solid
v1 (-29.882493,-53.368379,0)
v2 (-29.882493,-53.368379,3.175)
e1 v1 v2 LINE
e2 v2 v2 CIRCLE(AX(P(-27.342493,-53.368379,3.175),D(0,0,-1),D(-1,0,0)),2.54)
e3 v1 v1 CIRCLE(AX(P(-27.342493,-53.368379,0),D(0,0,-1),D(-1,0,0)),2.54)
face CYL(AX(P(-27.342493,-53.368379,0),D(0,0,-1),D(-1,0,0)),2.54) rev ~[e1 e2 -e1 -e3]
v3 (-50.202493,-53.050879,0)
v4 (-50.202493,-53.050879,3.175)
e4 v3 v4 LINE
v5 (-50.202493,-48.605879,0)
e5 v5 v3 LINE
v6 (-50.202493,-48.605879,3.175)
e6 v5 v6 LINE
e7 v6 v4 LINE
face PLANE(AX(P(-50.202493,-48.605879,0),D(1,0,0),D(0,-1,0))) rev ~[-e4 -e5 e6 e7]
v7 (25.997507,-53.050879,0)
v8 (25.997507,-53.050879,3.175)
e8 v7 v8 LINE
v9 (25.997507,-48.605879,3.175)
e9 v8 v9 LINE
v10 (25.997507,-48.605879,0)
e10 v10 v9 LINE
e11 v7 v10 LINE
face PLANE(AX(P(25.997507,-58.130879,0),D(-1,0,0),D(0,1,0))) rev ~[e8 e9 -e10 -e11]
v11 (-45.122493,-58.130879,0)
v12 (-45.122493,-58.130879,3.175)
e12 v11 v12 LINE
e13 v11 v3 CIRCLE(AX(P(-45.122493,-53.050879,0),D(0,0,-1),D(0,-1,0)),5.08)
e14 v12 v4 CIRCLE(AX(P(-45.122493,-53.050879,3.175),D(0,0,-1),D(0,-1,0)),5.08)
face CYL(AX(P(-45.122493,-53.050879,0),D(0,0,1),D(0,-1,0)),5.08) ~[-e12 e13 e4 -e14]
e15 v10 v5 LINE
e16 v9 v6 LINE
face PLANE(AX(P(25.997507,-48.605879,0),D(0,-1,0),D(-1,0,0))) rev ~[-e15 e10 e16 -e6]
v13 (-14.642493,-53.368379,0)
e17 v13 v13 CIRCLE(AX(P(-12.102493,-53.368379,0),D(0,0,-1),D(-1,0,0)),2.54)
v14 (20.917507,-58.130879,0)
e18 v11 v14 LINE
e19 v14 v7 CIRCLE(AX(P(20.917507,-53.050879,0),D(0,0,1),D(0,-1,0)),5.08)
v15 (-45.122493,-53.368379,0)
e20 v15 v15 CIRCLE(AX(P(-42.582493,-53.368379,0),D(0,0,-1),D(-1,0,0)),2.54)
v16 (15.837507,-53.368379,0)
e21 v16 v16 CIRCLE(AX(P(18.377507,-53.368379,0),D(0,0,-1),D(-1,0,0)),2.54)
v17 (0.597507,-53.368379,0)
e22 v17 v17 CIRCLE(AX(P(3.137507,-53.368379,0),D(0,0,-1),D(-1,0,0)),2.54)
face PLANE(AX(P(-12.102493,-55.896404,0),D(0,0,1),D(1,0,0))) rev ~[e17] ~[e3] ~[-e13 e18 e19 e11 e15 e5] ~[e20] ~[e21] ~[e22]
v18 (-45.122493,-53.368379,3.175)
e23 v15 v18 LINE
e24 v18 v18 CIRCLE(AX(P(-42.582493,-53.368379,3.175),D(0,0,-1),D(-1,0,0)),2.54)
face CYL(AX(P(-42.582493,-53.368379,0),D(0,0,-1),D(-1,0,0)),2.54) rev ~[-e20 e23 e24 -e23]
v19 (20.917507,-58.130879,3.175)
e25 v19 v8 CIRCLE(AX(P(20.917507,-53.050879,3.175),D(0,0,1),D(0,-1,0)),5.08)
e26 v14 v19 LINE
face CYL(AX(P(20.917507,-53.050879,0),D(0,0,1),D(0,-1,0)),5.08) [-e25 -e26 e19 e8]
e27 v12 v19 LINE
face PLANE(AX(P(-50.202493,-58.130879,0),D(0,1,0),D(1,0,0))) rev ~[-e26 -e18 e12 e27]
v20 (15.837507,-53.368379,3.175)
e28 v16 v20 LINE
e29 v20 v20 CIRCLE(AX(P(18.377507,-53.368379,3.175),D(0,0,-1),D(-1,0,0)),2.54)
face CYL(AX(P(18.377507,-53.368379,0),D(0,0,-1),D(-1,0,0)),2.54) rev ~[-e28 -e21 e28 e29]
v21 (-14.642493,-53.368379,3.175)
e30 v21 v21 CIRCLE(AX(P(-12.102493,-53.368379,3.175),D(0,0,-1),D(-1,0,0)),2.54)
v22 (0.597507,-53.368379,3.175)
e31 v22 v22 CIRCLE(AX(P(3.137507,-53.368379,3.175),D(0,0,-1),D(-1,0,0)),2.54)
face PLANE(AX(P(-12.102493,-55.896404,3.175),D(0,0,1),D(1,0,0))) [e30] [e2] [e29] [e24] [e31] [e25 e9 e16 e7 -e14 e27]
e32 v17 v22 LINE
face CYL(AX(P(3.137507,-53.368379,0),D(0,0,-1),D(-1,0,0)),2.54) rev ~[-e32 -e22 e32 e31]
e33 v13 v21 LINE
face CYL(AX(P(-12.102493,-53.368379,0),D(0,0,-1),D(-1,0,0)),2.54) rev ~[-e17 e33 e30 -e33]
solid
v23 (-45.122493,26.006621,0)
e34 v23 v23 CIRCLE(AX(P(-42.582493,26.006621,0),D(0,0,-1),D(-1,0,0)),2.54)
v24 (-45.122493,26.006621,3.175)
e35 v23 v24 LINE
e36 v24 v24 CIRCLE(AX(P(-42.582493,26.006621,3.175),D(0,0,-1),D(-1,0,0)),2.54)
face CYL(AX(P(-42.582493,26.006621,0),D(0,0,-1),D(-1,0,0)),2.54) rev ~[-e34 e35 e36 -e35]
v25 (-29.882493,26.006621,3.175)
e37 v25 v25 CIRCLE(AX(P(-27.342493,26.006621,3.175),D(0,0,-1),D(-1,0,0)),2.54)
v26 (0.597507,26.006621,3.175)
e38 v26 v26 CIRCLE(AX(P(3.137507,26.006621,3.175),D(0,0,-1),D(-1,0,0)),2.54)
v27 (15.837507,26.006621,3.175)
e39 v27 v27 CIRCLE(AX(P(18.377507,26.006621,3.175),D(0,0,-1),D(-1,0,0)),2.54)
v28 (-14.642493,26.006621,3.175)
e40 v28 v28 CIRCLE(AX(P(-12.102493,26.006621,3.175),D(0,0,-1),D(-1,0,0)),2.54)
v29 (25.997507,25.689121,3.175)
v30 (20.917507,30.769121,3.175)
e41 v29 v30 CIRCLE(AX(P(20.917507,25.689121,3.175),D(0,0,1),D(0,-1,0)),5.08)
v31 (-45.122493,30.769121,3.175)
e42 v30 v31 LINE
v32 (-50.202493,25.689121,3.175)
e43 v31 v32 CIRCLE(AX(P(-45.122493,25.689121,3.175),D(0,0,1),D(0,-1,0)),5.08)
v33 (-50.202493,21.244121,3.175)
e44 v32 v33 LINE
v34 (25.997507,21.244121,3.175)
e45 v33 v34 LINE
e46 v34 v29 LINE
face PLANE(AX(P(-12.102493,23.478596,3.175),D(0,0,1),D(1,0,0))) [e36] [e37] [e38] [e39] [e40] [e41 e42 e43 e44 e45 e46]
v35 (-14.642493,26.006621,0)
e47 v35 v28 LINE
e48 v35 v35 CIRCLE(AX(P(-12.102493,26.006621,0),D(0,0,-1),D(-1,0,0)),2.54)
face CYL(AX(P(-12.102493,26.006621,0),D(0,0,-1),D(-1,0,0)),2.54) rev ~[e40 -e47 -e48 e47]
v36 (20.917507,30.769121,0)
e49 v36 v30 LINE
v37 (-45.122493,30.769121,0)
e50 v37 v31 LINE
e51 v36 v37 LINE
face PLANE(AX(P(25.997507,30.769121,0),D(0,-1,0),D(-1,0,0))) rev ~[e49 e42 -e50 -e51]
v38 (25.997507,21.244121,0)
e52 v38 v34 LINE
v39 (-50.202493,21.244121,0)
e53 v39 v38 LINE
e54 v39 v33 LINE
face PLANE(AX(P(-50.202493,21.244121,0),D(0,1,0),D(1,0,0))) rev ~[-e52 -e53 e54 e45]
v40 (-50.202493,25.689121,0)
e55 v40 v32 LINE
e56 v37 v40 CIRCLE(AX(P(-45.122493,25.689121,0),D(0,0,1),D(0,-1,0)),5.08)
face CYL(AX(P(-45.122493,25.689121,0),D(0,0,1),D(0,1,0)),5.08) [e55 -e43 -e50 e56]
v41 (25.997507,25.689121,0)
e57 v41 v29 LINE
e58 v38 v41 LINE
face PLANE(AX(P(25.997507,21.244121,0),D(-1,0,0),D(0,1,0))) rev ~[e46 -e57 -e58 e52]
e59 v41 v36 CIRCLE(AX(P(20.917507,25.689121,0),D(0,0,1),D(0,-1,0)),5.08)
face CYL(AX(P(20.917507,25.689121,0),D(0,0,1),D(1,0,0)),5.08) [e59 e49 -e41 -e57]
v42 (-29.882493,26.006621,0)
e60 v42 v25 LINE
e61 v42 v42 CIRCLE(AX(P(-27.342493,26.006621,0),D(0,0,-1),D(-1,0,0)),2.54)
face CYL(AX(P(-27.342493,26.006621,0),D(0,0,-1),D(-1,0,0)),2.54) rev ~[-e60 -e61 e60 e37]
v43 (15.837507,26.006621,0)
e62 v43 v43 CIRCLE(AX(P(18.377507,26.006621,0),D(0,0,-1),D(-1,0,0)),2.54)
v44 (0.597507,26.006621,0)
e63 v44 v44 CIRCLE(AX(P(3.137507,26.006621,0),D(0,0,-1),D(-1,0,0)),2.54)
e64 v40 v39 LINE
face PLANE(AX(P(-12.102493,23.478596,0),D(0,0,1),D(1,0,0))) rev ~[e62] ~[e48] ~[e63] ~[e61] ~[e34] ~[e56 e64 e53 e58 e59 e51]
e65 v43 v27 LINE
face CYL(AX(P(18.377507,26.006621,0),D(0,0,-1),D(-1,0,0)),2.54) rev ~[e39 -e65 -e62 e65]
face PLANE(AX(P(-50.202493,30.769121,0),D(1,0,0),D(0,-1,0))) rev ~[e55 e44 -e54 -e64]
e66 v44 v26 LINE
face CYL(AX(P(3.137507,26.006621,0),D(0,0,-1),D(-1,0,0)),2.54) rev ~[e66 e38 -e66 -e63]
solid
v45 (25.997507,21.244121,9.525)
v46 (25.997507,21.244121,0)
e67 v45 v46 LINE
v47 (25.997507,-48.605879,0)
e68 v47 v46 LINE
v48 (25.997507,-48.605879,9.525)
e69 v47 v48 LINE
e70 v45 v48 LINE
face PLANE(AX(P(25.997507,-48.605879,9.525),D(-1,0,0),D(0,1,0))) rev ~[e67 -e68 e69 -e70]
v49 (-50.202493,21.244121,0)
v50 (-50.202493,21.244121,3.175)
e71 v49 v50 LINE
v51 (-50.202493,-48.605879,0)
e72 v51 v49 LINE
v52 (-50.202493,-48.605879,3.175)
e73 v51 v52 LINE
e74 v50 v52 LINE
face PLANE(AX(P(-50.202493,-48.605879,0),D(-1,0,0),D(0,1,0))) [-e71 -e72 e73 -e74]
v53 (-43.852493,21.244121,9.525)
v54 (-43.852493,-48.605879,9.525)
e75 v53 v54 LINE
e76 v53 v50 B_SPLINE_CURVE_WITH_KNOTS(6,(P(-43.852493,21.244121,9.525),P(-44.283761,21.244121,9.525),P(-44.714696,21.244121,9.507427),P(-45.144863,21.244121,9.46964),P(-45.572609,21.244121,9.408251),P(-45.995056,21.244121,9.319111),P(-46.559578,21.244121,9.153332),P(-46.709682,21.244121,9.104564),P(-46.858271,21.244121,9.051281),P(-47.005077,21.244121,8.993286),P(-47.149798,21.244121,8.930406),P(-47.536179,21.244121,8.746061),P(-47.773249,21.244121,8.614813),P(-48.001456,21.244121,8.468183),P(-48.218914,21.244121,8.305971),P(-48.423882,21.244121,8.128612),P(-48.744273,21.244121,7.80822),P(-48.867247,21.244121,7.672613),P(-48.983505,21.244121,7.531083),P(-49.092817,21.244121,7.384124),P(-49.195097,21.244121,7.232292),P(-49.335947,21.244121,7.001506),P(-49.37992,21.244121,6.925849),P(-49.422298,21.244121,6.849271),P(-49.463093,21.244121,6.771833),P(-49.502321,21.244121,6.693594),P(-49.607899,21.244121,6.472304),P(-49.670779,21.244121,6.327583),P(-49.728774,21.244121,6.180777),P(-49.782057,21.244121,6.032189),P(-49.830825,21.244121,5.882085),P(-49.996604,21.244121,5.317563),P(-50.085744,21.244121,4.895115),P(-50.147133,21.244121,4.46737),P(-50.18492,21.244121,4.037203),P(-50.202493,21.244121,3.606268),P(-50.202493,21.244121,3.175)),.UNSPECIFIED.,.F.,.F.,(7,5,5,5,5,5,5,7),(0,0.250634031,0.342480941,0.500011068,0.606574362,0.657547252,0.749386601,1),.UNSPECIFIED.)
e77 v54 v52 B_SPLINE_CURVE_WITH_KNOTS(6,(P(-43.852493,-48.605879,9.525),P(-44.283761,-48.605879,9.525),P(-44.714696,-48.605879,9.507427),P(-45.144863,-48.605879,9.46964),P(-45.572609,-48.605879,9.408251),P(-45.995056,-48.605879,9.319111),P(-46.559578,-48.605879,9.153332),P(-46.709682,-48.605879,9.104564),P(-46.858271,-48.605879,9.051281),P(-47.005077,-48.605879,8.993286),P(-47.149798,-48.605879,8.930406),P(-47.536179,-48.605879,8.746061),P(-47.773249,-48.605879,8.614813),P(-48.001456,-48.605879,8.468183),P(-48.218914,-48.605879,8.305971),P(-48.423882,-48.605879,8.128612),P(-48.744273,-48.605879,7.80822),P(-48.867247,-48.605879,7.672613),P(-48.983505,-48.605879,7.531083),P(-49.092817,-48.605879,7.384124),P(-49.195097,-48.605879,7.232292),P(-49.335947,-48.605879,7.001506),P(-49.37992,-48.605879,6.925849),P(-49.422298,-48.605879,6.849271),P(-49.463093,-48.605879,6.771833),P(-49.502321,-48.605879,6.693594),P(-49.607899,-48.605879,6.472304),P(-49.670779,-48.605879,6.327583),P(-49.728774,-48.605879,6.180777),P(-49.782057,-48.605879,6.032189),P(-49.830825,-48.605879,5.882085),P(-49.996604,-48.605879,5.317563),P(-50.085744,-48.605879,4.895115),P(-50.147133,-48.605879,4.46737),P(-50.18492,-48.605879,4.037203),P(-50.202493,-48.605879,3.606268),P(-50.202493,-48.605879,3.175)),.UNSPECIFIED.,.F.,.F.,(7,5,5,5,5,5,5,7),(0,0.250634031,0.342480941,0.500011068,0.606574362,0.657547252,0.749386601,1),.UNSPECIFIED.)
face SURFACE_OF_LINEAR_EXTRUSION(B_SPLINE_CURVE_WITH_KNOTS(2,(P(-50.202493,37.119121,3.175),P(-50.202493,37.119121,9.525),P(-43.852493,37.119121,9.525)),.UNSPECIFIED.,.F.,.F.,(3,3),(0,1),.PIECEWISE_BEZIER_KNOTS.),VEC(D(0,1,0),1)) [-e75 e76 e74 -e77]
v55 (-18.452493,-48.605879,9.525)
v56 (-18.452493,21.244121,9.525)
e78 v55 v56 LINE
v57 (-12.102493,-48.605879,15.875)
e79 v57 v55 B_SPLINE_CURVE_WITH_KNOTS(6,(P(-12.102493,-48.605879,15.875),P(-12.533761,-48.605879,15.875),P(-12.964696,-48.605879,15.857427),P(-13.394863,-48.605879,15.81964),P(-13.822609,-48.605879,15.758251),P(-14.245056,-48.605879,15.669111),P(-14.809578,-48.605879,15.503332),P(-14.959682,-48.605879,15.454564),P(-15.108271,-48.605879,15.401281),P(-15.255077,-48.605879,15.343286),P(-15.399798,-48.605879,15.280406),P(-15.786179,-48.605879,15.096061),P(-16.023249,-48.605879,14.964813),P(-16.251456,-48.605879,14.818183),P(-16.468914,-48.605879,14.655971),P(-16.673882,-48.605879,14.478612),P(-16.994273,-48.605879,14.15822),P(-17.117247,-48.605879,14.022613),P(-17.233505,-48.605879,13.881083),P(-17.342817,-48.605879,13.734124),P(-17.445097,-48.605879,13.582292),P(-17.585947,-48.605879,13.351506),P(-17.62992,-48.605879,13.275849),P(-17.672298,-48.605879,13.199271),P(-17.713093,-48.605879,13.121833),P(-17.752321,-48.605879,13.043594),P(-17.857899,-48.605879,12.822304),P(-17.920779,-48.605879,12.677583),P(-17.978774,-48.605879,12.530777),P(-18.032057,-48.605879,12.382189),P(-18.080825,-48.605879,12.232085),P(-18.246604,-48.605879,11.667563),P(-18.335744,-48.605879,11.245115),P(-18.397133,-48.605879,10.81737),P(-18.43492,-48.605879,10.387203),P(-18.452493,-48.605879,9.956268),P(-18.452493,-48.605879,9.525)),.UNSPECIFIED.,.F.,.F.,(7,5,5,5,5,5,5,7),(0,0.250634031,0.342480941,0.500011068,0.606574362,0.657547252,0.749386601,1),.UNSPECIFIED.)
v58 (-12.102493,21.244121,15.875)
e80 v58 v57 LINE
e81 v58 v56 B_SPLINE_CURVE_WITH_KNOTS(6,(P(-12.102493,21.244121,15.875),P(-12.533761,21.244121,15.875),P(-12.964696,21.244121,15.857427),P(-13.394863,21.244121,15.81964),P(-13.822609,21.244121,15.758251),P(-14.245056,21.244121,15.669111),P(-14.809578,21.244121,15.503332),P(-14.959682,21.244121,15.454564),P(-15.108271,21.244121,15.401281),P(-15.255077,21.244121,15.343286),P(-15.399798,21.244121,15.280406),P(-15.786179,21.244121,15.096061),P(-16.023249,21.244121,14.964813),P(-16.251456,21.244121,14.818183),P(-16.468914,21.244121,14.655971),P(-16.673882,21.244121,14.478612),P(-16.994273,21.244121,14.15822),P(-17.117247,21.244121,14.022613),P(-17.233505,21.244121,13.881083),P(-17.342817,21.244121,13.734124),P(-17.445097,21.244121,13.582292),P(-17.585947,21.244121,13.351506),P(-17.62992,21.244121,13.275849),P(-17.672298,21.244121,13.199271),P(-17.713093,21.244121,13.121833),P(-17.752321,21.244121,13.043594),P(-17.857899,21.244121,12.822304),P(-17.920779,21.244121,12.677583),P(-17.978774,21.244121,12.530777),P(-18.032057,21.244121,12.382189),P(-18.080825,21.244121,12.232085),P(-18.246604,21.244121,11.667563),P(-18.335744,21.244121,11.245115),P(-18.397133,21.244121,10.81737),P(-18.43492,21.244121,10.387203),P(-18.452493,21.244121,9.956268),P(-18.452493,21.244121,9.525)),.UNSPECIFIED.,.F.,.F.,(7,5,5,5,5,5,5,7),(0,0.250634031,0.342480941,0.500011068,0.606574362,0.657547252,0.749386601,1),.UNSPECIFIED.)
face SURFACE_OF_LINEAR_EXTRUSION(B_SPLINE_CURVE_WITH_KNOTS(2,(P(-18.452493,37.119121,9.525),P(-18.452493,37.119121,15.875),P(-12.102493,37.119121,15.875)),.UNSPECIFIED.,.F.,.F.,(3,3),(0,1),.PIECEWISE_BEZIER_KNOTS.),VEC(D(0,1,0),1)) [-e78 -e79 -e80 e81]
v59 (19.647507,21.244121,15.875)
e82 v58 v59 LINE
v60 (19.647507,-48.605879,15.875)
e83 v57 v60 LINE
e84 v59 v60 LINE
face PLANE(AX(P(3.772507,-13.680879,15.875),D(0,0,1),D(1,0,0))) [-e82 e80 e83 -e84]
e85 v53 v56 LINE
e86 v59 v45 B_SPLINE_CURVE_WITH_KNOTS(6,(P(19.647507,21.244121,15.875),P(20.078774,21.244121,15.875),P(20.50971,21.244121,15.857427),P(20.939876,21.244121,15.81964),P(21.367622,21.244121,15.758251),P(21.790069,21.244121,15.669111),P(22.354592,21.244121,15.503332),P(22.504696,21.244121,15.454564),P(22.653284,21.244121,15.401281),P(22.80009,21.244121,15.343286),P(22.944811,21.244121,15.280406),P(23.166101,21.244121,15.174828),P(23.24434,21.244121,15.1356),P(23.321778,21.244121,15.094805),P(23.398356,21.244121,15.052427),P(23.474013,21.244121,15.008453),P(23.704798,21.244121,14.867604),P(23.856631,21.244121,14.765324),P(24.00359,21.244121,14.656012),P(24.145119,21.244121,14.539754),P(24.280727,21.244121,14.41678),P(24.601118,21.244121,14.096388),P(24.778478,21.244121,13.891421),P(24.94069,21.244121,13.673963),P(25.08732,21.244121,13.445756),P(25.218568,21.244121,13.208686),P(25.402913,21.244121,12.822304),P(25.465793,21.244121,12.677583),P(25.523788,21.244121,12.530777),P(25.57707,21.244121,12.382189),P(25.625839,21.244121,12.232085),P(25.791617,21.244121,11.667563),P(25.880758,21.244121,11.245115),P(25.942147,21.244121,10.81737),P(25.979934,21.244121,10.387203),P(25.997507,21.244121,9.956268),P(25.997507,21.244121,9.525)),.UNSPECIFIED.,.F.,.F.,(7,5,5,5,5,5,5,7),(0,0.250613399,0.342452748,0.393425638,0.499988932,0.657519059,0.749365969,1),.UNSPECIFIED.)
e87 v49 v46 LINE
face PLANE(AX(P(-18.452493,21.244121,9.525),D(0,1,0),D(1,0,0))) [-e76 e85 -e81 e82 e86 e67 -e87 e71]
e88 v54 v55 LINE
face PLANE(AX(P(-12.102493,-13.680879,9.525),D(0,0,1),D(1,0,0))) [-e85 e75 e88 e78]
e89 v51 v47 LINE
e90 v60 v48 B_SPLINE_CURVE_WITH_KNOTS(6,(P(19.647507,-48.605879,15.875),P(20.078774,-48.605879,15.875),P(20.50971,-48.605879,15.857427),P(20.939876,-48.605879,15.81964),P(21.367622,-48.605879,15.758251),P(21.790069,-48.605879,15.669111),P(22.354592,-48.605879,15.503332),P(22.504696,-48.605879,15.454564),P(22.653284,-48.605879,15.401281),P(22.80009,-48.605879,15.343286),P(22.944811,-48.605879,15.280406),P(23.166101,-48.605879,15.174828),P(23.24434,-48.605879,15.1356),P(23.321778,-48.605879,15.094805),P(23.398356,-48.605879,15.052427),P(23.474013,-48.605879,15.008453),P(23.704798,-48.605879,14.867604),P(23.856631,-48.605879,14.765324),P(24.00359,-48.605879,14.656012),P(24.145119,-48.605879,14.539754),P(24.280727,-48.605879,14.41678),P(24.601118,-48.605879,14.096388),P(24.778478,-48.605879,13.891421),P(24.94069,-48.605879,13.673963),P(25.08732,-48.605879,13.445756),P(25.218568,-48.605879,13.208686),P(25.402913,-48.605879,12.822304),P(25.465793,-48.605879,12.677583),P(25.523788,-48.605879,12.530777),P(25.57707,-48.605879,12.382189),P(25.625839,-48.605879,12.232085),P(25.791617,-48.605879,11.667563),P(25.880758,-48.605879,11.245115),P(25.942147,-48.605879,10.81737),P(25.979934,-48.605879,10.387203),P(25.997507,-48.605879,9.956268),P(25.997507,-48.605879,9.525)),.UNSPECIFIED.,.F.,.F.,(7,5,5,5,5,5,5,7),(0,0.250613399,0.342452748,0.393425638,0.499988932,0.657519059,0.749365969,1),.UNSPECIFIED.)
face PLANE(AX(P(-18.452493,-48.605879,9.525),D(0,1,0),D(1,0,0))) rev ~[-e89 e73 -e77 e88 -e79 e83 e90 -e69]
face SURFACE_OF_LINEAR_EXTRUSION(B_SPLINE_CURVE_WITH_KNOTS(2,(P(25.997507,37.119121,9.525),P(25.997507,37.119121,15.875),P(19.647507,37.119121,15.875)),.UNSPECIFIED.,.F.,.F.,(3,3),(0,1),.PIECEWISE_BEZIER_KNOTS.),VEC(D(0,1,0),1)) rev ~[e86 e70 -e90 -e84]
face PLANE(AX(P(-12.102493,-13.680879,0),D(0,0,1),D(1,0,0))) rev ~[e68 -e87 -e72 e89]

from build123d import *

# Parameters (mm, degrees)
F1_DEPTH    = 3.175
F0_W        = 76.2
F0_H        = 69.85
F2_DEPTH    = 9.525
F3_W        = 44.45
F3_H        = 69.85
F4_DEPTH    = 6.35
F5_T1_DEPTH = 101.6
F6_R        = 5.08
F6_2_R      = 5.08


# Not quite as in the source:
# - a fillet or chamfer that OpenCascade refuses, or shapes differently, is made with other operations: its cross-section is extruded or revolved along the edge and cut away or added


with BuildPart() as f1:
    # F0 (on Top) → F1 (new body)
    with BuildSketch(Plane.XY):
        with BuildLine():
            Line((-45.1224932384, -53.3683788409), (-50.2024932384, -53.3683788409))
            Line((-50.2024932384, -53.3683788409), (-50.2024932384, -58.1308788409))
            Line((-50.2024932384, -58.1308788409), (25.9975067616, -58.1308788409))
            Line((25.9975067616, -58.1308788409), (25.9975067616, -53.3683788409))
            Line((25.9975067616, -53.3683788409), (20.9175067616, -53.3683788409))
            ThreePointArc((20.9175067616, -53.3683788409), (18.3775067616, -55.9083788409), (15.8375067616, -53.3683788409))
            Line((15.8375067616, -53.3683788409), (5.6775067616, -53.3683788409))
            ThreePointArc((5.6775067616, -53.3683788409), (3.1375067616, -55.9083788409), (0.5975067616, -53.3683788409))
            Line((0.5975067616, -53.3683788409), (-9.5624932384, -53.3683788409))
            ThreePointArc((-9.5624932384, -53.3683788409), (-12.1024932384, -55.9083788409), (-14.6424932384, -53.3683788409))
            Line((-14.6424932384, -53.3683788409), (-24.8024932384, -53.3683788409))
            ThreePointArc((-24.8024932384, -53.3683788409), (-27.3424932384, -55.9083788409), (-29.8824932384, -53.3683788409))
            Line((-29.8824932384, -53.3683788409), (-40.0424932384, -53.3683788409))
            ThreePointArc((-40.0424932384, -53.3683788409), (-42.5824932384, -55.9083788409), (-45.1224932384, -53.3683788409))
        make_face()
        with BuildLine():
            Line((25.9975067616, -48.6058788409), (-50.2024932384, -48.6058788409))
            Line((-50.2024932384, -48.6058788409), (-50.2024932384, -53.3683788409))
            Line((-50.2024932384, -53.3683788409), (-45.1224932384, -53.3683788409))
            ThreePointArc((-45.1224932384, -53.3683788409), (-42.5824932384, -50.8283788409), (-40.0424932384, -53.3683788409))
            Line((-40.0424932384, -53.3683788409), (-29.8824932384, -53.3683788409))
            ThreePointArc((-29.8824932384, -53.3683788409), (-27.3424932384, -50.8283788409), (-24.8024932384, -53.3683788409))
            Line((-24.8024932384, -53.3683788409), (-14.6424932384, -53.3683788409))
            ThreePointArc((-14.6424932384, -53.3683788409), (-12.1024932384, -50.8283788409), (-9.5624932384, -53.3683788409))
            Line((-9.5624932384, -53.3683788409), (0.5975067616, -53.3683788409))
            ThreePointArc((0.5975067616, -53.3683788409), (3.1375067616, -50.8283788409), (5.6775067616, -53.3683788409))
            Line((5.6775067616, -53.3683788409), (15.8375067616, -53.3683788409))
            ThreePointArc((15.8375067616, -53.3683788409), (18.3775067616, -50.8283788409), (20.9175067616, -53.3683788409))
            Line((20.9175067616, -53.3683788409), (25.9975067616, -53.3683788409))
            Line((25.9975067616, -53.3683788409), (25.9975067616, -48.6058788409))
        make_face()
    extrude(amount=F1_DEPTH)

    # F6#2
    f6_2_edges = [f1.edges().sort_by_distance(p)[0] for p in [
        (-50.202493, -58.130879, 1.5875),
        (25.997507, -58.130879, 1.5875),
    ]]
    fillet(f6_2_edges, radius=F6_2_R)


with BuildPart() as f1b:
    # F0 (on Top) → F1, piece 2 (new body)
    with BuildSketch(Plane.XY):
        with BuildLine():
            Line((-45.1224932384, 26.0066211591), (-50.2024932384, 26.0066211591))
            Line((-50.2024932384, 26.0066211591), (-50.2024932384, 21.2441211591))
            Line((-50.2024932384, 21.2441211591), (25.9975067616, 21.2441211591))
            Line((25.9975067616, 21.2441211591), (25.9975067616, 26.0066211591))
            Line((25.9975067616, 26.0066211591), (20.9175067616, 26.0066211591))
            ThreePointArc((20.9175067616, 26.0066211591), (18.3775067616, 23.4666211591), (15.8375067616, 26.0066211591))
            Line((15.8375067616, 26.0066211591), (5.6775067616, 26.0066211591))
            ThreePointArc((5.6775067616, 26.0066211591), (3.1375067616, 23.4666211591), (0.5975067616, 26.0066211591))
            Line((0.5975067616, 26.0066211591), (-9.5624932384, 26.0066211591))
            ThreePointArc((-9.5624932384, 26.0066211591), (-12.1024932384, 23.4666211591), (-14.6424932384, 26.0066211591))
            Line((-14.6424932384, 26.0066211591), (-24.8024932384, 26.0066211591))
            ThreePointArc((-24.8024932384, 26.0066211591), (-27.3424932384, 23.4666211591), (-29.8824932384, 26.0066211591))
            Line((-29.8824932384, 26.0066211591), (-40.0424932384, 26.0066211591))
            ThreePointArc((-40.0424932384, 26.0066211591), (-42.5824932384, 23.4666211591), (-45.1224932384, 26.0066211591))
        make_face()
        with BuildLine():
            Line((25.9975067616, 30.7691211591), (-50.2024932384, 30.7691211591))
            Line((-50.2024932384, 30.7691211591), (-50.2024932384, 26.0066211591))
            Line((-50.2024932384, 26.0066211591), (-45.1224932384, 26.0066211591))
            ThreePointArc((-45.1224932384, 26.0066211591), (-42.5824932384, 28.5466211591), (-40.0424932384, 26.0066211591))
            Line((-40.0424932384, 26.0066211591), (-29.8824932384, 26.0066211591))
            ThreePointArc((-29.8824932384, 26.0066211591), (-27.3424932384, 28.5466211591), (-24.8024932384, 26.0066211591))
            Line((-24.8024932384, 26.0066211591), (-14.6424932384, 26.0066211591))
            ThreePointArc((-14.6424932384, 26.0066211591), (-12.1024932384, 28.5466211591), (-9.5624932384, 26.0066211591))
            Line((-9.5624932384, 26.0066211591), (0.5975067616, 26.0066211591))
            ThreePointArc((0.5975067616, 26.0066211591), (3.1375067616, 28.5466211591), (5.6775067616, 26.0066211591))
            Line((5.6775067616, 26.0066211591), (15.8375067616, 26.0066211591))
            ThreePointArc((15.8375067616, 26.0066211591), (18.3775067616, 28.5466211591), (20.9175067616, 26.0066211591))
            Line((20.9175067616, 26.0066211591), (25.9975067616, 26.0066211591))
            Line((25.9975067616, 26.0066211591), (25.9975067616, 30.7691211591))
        make_face()
    extrude(amount=F1_DEPTH)

    # F6
    f6_edges = [f1b.edges().sort_by_distance(p)[0] for p in [
        (25.997507, 30.769121, 1.5875),
        (-50.202493, 30.769121, 1.5875),
    ]]
    fillet(f6_edges, radius=F6_R)


with BuildPart() as f2:
    # F0 (on Top) → F2 (new body)
    with BuildSketch(Plane.XY):
        with Locations((-12.1024932384, -13.6808788409)):
            Rectangle(F0_W, F0_H)
    extrude(amount=F2_DEPTH)

    # F3 (on face) → F4 (join)
    with BuildSketch(Plane.XY.offset(9.525)):
        with Locations((3.7725067616, -13.6808788409)):
            Rectangle(F3_W, F3_H)
    extrude(amount=F4_DEPTH)

    # F5: fillet of radius 6.35 on 3 edges, made by hand

    # F5_s2 → F5_t1 (cut)
    with BuildSketch(Plane.XZ.offset(-37.1191211591)):
        with BuildLine():
            add(Edge.make_bspline(
                [(-18.4524932384, 9.525), (-18.4524932384, 15.875), (-12.1024932384, 15.875)],
                knots=[0, 0, 0, 1, 1, 1], degree=2, weights=[1, 1, 1]))
            Line((-12.1024932384, 15.875), (-18.4524932384, 15.875))
            Line((-18.4524932384, 15.875), (-18.4524932384, 9.525))
        make_face()
        with BuildLine():
            add(Edge.make_bspline(
                [(25.9975067616, 9.525), (25.9975067616, 15.875), (19.6475067616, 15.875)],
                knots=[0, 0, 0, 1, 1, 1], degree=2, weights=[1, 1, 1]))
            Line((19.6475067616, 15.875), (25.9975067616, 15.875))
            Line((25.9975067616, 15.875), (25.9975067616, 9.525))
        make_face()
        with BuildLine():
            add(Edge.make_bspline(
                [(-50.2024932384, 3.175), (-50.2024932384, 9.525), (-43.8524932384, 9.525)],
                knots=[0, 0, 0, 1, 1, 1], degree=2, weights=[1, 1, 1]))
            Line((-43.8524932384, 9.525), (-50.2024932384, 9.525))
            Line((-50.2024932384, 9.525), (-50.2024932384, 3.175))
        make_face()
    extrude(amount=F5_T1_DEPTH, mode=Mode.SUBTRACT)


solid = Compound([f1.part, f1b.part, f2.part])
